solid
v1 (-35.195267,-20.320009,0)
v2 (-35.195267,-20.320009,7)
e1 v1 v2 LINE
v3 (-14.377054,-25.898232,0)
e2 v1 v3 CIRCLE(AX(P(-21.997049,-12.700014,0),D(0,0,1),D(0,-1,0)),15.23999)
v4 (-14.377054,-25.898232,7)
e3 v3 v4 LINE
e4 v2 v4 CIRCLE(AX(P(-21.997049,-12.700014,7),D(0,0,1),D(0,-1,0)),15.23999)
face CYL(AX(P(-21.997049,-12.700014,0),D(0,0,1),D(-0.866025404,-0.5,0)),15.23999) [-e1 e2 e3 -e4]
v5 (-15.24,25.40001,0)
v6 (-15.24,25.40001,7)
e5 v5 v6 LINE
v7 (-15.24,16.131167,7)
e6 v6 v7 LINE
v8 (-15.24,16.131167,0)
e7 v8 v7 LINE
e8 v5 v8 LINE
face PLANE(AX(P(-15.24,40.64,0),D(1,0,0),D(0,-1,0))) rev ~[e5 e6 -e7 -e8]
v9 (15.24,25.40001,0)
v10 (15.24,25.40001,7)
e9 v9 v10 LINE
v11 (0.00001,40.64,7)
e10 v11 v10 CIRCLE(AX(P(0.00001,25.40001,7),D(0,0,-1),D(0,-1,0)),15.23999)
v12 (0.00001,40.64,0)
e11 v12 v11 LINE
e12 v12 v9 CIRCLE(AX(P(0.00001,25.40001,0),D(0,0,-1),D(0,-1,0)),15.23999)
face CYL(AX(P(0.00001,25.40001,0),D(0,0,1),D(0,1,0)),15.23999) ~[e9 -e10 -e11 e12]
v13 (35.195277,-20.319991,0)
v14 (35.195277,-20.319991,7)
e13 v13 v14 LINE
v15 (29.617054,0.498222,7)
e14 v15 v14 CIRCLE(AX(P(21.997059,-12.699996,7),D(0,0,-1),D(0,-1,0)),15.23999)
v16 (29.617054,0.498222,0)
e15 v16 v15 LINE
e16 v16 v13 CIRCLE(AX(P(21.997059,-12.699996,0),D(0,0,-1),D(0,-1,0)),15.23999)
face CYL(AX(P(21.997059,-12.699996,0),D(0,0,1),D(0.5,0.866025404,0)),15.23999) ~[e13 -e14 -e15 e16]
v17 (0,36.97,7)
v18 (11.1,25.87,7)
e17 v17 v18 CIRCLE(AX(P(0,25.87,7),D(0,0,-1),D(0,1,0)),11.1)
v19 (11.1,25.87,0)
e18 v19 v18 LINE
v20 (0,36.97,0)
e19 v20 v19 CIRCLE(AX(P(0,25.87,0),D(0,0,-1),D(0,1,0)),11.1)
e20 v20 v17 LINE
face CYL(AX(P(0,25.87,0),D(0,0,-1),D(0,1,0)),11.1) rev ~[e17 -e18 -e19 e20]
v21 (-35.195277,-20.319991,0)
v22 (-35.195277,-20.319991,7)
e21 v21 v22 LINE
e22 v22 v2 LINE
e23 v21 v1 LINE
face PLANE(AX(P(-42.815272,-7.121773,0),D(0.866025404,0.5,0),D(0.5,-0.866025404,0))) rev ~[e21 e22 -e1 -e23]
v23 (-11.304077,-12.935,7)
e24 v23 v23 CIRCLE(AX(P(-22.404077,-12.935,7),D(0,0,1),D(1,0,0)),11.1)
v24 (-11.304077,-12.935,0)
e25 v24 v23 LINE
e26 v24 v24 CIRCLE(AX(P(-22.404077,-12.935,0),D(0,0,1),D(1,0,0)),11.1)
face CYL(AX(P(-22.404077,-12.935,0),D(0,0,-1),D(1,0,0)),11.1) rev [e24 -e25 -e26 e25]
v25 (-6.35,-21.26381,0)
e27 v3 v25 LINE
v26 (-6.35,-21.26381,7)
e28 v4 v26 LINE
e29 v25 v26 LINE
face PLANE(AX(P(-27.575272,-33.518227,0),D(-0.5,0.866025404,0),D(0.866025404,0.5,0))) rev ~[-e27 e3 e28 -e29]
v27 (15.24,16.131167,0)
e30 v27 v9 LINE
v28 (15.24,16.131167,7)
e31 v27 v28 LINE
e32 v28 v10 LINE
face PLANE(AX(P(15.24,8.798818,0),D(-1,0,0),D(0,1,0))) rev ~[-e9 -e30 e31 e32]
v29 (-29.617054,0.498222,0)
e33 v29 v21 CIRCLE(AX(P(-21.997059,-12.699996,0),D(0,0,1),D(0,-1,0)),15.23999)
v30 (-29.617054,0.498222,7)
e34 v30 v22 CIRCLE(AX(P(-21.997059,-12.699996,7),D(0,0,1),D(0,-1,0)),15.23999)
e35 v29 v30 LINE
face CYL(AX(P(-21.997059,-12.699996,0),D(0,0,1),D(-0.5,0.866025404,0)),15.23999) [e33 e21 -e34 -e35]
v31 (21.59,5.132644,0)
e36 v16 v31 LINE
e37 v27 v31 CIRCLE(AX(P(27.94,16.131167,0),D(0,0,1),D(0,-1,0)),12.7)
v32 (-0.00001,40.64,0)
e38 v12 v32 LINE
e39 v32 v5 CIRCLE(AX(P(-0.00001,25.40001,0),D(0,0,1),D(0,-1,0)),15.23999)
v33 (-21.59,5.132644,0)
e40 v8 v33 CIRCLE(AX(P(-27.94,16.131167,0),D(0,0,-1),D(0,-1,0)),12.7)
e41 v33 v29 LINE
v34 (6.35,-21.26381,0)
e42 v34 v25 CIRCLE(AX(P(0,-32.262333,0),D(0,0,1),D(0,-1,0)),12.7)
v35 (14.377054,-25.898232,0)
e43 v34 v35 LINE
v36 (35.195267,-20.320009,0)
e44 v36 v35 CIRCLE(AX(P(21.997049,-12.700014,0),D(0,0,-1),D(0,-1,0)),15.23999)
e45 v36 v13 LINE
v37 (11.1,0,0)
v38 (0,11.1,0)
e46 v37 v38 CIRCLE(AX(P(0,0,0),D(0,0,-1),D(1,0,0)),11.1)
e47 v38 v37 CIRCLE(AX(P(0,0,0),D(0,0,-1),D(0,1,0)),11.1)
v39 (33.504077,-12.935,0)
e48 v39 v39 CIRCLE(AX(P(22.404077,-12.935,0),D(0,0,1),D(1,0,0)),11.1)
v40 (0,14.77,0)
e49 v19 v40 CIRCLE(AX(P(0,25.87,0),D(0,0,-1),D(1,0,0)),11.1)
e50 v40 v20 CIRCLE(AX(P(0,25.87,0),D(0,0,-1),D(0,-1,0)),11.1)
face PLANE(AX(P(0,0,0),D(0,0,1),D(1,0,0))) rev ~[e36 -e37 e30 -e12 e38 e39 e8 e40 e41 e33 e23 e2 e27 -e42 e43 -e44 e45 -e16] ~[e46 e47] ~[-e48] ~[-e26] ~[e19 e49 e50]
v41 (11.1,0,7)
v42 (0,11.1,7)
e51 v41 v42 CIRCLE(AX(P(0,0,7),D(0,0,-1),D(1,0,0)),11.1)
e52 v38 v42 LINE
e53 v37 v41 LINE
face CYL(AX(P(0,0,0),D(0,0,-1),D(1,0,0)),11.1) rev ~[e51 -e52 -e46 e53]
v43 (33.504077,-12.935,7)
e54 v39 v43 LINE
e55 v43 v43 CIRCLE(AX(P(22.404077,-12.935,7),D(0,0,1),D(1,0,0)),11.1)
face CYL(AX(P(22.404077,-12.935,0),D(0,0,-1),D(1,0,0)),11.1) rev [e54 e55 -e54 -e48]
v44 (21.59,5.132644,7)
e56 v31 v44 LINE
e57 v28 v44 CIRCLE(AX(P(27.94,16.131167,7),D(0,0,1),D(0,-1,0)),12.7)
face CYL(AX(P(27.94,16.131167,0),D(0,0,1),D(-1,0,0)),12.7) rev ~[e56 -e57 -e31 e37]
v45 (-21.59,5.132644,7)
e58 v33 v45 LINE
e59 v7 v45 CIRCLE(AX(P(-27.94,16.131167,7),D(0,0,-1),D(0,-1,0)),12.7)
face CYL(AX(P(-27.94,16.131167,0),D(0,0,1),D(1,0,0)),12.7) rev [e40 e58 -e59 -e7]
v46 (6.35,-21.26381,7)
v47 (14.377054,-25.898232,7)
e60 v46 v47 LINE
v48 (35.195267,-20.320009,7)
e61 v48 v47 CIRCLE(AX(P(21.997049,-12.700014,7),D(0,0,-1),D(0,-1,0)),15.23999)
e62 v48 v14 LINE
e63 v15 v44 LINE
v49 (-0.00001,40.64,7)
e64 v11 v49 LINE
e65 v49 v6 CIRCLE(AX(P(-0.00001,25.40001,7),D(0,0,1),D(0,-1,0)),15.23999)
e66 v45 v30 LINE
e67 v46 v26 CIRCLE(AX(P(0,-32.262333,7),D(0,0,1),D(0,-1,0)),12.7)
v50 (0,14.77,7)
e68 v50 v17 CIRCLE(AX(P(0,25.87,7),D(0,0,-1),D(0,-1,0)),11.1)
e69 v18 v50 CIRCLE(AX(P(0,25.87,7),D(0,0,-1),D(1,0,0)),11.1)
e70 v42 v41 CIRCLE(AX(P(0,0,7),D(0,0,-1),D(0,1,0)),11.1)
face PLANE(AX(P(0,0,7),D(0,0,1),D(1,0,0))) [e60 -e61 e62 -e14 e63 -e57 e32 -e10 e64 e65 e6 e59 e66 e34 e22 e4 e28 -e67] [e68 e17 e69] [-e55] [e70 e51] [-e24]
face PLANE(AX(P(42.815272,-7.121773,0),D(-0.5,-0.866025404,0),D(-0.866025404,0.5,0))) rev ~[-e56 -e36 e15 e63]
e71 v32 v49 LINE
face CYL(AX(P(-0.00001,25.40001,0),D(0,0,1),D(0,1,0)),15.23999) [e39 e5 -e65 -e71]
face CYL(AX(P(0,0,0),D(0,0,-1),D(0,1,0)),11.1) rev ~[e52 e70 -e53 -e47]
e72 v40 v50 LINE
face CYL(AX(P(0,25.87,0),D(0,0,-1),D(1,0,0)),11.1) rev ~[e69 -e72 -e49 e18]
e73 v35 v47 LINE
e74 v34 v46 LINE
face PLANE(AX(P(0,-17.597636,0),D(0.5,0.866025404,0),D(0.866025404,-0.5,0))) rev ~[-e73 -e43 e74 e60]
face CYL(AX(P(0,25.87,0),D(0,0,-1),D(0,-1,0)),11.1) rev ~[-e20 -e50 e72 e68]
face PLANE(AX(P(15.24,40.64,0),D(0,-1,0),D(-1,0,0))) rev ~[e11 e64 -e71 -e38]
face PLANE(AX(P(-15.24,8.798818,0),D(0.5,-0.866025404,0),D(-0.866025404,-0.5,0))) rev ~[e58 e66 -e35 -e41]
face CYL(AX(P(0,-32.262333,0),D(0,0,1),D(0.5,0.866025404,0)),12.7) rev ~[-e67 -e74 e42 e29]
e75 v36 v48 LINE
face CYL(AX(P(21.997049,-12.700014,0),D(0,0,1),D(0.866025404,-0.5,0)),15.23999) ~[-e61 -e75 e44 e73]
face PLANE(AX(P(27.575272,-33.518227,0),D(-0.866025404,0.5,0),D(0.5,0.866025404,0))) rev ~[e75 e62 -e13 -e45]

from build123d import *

# Parameters (mm, degrees)
F0_R     = 11.1
F1_DEPTH = 7
F2_R     = 15.23999
F3_R     = 12.7


# Not quite as in the source:
# - a fillet or chamfer is up to 0.001 mm smaller than in the source, because OpenCascade refuses the exact size


with BuildPart() as f1:
    # F0 (on Top) → F1 (new body)
    with BuildSketch(Plane.XY):
        Polygon((15.24, 40.64), (0, 40.64), (-15.24, 40.64), (-15.24, 8.7988181024), (-42.8152724098, -7.1217728463), (-27.5752724098, -33.5182271537), (0, -17.5976362049), (27.5752724098, -33.5182271537), (42.8152724098, -7.1217728463), (15.24, 8.7988181024), align=None)
        with Locations((-22.4040771959, -12.935)):
            Circle(F0_R, mode=Mode.SUBTRACT)
        with BuildLine():
            ThreePointArc((0, 11.1), (7.8488852712, 7.8488852712), (11.1, 0))
            ThreePointArc((11.1, 0), (-7.8488852712, -7.8488852712), (0, 11.1))
        make_face(mode=Mode.SUBTRACT)
        with Locations((22.4040771959, -12.935)):
            Circle(F0_R, mode=Mode.SUBTRACT)
        with BuildLine():
            ThreePointArc((11.1, 25.87), (7.8488852712, 18.0211147288), (0, 14.77))
            ThreePointArc((0, 14.77), (-11.1, 25.87), (0, 36.97))
            ThreePointArc((0, 36.97), (7.8488852712, 33.7188852712), (11.1, 25.87))
        make_face(mode=Mode.SUBTRACT)
    extrude(amount=F1_DEPTH)

    # F2 (radius 15.24 in the source; OpenCascade refuses exactly that, so slightly less here)
    f2_edges = [f1.edges().sort_by_distance(p)[0] for p in [
        (15.24, 40.64, 3.5),
        (-15.24, 40.64, 3.5),
        (-42.815272, -7.121773, 3.5),
        (-27.575272, -33.518227, 3.5),
        (42.815272, -7.121773, 3.5),
        (27.575272, -33.518227, 3.5),
    ]]
    fillet(f2_edges, radius=F2_R)

    # F3
    f3_edges = [f1.edges().sort_by_distance(p)[0] for p in [
        (15.24, 8.798818, 3.5),
        (0, -17.597636, 3.5),
        (-15.24, 8.798818, 3.5),
    ]]
    fillet(f3_edges, radius=F3_R)


solid = f1.part
